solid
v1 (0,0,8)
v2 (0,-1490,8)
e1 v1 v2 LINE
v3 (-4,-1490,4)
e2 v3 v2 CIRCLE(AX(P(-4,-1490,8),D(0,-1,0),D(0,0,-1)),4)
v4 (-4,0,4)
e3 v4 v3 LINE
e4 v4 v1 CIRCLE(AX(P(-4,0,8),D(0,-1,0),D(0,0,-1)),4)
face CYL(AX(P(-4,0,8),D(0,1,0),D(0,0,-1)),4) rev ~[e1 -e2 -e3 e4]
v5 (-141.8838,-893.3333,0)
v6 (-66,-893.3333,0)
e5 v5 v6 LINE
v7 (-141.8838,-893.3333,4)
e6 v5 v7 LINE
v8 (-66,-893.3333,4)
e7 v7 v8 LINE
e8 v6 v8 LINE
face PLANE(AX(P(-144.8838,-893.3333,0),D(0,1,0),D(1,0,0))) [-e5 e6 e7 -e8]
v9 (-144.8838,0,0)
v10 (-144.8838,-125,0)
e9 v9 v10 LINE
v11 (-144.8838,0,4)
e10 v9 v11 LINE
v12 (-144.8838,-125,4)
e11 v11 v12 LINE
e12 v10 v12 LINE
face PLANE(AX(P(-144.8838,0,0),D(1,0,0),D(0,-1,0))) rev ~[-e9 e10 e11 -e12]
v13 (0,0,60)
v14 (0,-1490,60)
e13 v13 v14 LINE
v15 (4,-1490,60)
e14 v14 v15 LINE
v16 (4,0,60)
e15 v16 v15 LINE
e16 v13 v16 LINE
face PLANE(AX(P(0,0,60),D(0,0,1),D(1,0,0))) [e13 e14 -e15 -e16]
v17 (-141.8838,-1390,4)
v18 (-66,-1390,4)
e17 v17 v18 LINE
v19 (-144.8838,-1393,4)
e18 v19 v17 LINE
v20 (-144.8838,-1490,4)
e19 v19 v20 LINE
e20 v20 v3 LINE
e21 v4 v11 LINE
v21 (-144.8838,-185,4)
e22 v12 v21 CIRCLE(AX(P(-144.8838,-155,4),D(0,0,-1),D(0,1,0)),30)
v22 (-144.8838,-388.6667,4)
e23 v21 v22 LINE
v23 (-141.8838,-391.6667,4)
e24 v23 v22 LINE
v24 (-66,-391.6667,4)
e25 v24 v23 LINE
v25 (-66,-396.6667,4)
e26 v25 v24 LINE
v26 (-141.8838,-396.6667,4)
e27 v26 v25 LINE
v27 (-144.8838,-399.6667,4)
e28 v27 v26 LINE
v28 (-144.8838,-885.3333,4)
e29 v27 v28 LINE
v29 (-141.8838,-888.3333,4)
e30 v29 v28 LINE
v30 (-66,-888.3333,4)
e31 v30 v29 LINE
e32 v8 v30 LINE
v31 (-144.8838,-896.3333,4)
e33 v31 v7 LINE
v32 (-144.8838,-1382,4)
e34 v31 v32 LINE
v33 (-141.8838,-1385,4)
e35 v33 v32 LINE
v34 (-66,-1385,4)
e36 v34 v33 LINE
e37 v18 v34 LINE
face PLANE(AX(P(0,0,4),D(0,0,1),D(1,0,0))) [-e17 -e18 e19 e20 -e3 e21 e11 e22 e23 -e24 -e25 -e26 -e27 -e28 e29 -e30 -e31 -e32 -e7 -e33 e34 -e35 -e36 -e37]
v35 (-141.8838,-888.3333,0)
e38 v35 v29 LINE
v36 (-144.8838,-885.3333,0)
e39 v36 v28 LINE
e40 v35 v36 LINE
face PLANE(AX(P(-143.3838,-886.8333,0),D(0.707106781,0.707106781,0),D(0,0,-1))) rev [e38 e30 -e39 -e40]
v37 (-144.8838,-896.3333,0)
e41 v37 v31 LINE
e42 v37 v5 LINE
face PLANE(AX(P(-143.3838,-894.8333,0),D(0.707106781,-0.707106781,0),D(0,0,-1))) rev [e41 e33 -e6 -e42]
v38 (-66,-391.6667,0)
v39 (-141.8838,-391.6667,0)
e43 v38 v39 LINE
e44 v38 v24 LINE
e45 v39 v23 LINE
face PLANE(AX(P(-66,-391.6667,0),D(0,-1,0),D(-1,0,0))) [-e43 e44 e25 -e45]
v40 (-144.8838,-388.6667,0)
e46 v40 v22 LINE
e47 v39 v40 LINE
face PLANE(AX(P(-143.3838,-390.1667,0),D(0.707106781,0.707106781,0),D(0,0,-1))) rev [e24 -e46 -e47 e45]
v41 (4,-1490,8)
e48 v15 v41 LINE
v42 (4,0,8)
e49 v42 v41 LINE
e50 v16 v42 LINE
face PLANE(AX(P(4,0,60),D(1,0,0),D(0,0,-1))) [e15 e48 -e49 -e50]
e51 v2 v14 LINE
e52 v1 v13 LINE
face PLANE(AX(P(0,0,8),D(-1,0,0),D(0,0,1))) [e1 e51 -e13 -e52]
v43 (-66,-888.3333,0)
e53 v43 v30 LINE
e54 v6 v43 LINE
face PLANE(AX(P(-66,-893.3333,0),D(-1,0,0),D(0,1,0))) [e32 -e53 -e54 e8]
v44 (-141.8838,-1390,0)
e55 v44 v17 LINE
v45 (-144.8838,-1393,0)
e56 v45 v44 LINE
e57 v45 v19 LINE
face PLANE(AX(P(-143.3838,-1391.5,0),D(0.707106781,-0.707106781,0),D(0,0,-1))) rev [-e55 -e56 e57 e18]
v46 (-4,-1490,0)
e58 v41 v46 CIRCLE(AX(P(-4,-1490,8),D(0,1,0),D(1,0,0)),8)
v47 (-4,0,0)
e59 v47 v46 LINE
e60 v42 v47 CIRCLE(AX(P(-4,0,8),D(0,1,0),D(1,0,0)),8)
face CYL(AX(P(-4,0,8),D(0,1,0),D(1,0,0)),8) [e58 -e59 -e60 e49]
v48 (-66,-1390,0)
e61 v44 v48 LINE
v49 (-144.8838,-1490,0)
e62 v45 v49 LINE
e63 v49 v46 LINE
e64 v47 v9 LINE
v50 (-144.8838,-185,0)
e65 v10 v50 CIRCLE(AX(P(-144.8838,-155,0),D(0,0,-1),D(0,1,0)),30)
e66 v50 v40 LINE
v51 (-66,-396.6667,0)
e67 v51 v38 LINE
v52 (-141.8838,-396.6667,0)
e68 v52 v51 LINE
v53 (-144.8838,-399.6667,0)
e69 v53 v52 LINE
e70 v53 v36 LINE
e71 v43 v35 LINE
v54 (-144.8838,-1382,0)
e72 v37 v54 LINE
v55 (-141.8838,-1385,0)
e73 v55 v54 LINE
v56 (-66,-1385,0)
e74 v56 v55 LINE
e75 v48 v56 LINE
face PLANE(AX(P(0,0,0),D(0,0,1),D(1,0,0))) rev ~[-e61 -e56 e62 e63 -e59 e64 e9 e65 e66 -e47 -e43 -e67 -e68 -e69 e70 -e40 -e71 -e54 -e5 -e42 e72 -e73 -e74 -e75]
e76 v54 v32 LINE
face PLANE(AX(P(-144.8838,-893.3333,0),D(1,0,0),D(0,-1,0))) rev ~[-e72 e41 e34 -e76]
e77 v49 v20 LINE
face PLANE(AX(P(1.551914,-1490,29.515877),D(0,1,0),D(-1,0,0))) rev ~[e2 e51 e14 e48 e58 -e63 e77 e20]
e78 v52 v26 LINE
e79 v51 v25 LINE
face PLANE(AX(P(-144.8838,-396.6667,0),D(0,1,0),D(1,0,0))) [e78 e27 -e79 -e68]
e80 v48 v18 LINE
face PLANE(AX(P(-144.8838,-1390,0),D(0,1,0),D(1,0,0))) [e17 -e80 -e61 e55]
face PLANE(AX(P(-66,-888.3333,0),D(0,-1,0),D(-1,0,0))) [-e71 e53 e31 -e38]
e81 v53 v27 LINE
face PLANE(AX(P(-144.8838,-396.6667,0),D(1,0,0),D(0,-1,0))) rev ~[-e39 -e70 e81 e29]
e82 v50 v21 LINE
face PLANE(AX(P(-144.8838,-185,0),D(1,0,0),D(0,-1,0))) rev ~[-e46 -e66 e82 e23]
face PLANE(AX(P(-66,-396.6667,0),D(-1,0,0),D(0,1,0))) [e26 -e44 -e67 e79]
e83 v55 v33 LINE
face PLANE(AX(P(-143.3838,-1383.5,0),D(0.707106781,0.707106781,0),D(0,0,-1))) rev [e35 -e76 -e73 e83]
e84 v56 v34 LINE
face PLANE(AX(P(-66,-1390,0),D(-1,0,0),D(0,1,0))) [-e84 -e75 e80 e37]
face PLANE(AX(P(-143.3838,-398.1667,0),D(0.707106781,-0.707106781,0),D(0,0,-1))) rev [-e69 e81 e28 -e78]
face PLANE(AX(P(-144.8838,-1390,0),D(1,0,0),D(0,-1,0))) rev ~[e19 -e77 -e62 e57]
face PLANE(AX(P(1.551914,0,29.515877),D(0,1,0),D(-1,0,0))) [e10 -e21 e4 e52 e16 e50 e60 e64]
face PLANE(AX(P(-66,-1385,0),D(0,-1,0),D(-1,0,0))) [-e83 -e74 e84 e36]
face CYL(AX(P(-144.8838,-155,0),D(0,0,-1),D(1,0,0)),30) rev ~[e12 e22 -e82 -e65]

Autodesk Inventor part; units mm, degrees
ref_plane "YZ Plane" through (0, 0, 0) normal (1, 0, 0) x (0, 1, 0)
ref_plane "XZ Plane" through (0, 0, 0) normal (0, 1, 0) x (-1, 0, 0)
ref_plane "XY Plane" through (0, 0, 0) normal (0, 0, 1) x (1, 0, 0)
sketch "Sketch1" plane through (0, 0, 0) normal (0, 0, 1) x (1, 0, 0)
  line L0 (0, 0) -> (-144.8838, 0)
  line L1 (-144.8838, 0) -> (-144.8838, -1490)
  line L2 (-144.8838, -1490) -> (0, -1490)
  line L3 (0, -1490) -> (0, 0)
  line L4 (-144.8838, -1390) -> (-66, -1390)
  line L5 (-66, -1390) -> (-66, -1385)
  line L6 (-66, -1385) -> (-144.8838, -1385)
  line L7 (-144.8838, -1385) -> (-144.8838, -1390)
  line L8 (-144.8838, -893.3333) -> (-66, -893.3333)
  line L9 (-66, -893.3333) -> (-66, -888.3333)
  line L10 (-66, -888.3333) -> (-144.8838, -888.3333)
  line L11 (-144.8838, -888.3333) -> (-144.8838, -893.3333)
  line L12 (-144.8838, -396.6667) -> (-66, -396.6667)
  line L13 (-66, -396.6667) -> (-66, -391.6667)
  line L14 (-66, -391.6667) -> (-144.8838, -391.6667)
  line L15 (-144.8838, -391.6667) -> (-144.8838, -396.6667)
  circle A0 centre (-144.8838, -155) radius 30
  point P0 (-144.8838, -391.6667)
  point P1 (-144.8838, -1385)
  point P2 (-144.8838, -125)
  point P3 (-144.8838, -185)
  dimension "d0" = 1490
  dimension "d1" = 144.8838
  dimension "d2" = 5
  dimension "d4" = 100
  dimension "d7" = 496.6667
  dimension "d23" = 66
  dimension "d28" = 60
  dimension "d29" = 1335
extrude "Plate1" add sketch "Sketch1" along normal blind 4 contours L3 L2 L1 L4 L5 L6 L8 L9 L10 L12 L13 L14 A0 L0
sketch "Sketch2" plane through (4, 0, 0) normal (-1, 0, 0) x (0, -1, 0)
  line L0 (1490, 0) -> (0, 0)
  line L1 (0, 0) -> (0, 60)
  line L2 (0, 60) -> (1490, 60)
  line L3 (1490, 60) -> (1490, 0)
edge flange "Flange1" height 60 angle 90 thickness 4 bend radius 4 thickness toward (-1, 0, 0) relief tear relief width 4 relief depth 2 edges at (0, -745, 4) wall of the first edge with corners at (4, -1490, 0) (4, 0, 0) (4, 0, 60) (4, -1490, 60)
bend "Bend1"
corner "Corner1"
chamfer "Corner Chamfer1" distance 3 angle 45 6 edges at (-144.8838, -1390, 2) (-144.8838, -1385, 2) (-144.8838, -893.3333, 2) (-144.8838, -888.3333, 2) (-144.8838, -391.6667, 2) (-144.8838, -396.6667, 2)
equation "\"d0\" = Стрингер_длина"
equation "\"d1\" = стрингер_глубина_5"
equation "\"d2\" = паз_под_стрингер_толщина"
equation "\"d7\" = 0.333333 * Стрингер_длина"
equation "\"d23\" = паз_под_стрингер_глубина - Thickness"
equation "\"d28\" = 2 * радиус_выреза_под_сварку"
equation "\"d12\" = Thickness"
equation "\"d13\" = BendReliefWidth"
equation "\"d14\" = BendReliefDepth"
equation "\"d15\" = MinimumRemnant"
equation "\"d16\" = TransitionRadius"
equation "\"d17\" = ребро_усилителей"
equation "\"d19\" = BendRadius"
equation "\"d20\" = CornerReliefSize"
equation "\"d21\" = GapSize"
equation "\"d22\" = JacobiRadiusSize"
equation "\"BendRadius\" = Thickness"
equation "\"BendReliefWidth\" = Thickness"
equation "\"BendReliefDepth\" = 0.5 * Thickness"
equation "\"CornerReliefSize\" = 4 * Thickness"
equation "\"MinimumRemnant\" = 2 * Thickness"
equation "\"TransitionRadius\" = BendRadius"
equation "\"JacobiRadiusSize\" = BendRadius"
equation "\"GapSize\" = Thickness"
equation "\"Стрингер_длина\" = 1490"
equation "\"стрингер_глубина_5\" = 144.883787"
equation "\"паз_под_стрингер_толщина\" = 5"
equation "\"паз_под_стрингер_глубина\" = 70"
equation "\"Thickness\" = 4"
equation "\"радиус_выреза_под_сварку\" = 30"
equation "\"ребро_усилителей\" = 60"
properties part number "GBK 0203 stringer 5" material "Steel"
